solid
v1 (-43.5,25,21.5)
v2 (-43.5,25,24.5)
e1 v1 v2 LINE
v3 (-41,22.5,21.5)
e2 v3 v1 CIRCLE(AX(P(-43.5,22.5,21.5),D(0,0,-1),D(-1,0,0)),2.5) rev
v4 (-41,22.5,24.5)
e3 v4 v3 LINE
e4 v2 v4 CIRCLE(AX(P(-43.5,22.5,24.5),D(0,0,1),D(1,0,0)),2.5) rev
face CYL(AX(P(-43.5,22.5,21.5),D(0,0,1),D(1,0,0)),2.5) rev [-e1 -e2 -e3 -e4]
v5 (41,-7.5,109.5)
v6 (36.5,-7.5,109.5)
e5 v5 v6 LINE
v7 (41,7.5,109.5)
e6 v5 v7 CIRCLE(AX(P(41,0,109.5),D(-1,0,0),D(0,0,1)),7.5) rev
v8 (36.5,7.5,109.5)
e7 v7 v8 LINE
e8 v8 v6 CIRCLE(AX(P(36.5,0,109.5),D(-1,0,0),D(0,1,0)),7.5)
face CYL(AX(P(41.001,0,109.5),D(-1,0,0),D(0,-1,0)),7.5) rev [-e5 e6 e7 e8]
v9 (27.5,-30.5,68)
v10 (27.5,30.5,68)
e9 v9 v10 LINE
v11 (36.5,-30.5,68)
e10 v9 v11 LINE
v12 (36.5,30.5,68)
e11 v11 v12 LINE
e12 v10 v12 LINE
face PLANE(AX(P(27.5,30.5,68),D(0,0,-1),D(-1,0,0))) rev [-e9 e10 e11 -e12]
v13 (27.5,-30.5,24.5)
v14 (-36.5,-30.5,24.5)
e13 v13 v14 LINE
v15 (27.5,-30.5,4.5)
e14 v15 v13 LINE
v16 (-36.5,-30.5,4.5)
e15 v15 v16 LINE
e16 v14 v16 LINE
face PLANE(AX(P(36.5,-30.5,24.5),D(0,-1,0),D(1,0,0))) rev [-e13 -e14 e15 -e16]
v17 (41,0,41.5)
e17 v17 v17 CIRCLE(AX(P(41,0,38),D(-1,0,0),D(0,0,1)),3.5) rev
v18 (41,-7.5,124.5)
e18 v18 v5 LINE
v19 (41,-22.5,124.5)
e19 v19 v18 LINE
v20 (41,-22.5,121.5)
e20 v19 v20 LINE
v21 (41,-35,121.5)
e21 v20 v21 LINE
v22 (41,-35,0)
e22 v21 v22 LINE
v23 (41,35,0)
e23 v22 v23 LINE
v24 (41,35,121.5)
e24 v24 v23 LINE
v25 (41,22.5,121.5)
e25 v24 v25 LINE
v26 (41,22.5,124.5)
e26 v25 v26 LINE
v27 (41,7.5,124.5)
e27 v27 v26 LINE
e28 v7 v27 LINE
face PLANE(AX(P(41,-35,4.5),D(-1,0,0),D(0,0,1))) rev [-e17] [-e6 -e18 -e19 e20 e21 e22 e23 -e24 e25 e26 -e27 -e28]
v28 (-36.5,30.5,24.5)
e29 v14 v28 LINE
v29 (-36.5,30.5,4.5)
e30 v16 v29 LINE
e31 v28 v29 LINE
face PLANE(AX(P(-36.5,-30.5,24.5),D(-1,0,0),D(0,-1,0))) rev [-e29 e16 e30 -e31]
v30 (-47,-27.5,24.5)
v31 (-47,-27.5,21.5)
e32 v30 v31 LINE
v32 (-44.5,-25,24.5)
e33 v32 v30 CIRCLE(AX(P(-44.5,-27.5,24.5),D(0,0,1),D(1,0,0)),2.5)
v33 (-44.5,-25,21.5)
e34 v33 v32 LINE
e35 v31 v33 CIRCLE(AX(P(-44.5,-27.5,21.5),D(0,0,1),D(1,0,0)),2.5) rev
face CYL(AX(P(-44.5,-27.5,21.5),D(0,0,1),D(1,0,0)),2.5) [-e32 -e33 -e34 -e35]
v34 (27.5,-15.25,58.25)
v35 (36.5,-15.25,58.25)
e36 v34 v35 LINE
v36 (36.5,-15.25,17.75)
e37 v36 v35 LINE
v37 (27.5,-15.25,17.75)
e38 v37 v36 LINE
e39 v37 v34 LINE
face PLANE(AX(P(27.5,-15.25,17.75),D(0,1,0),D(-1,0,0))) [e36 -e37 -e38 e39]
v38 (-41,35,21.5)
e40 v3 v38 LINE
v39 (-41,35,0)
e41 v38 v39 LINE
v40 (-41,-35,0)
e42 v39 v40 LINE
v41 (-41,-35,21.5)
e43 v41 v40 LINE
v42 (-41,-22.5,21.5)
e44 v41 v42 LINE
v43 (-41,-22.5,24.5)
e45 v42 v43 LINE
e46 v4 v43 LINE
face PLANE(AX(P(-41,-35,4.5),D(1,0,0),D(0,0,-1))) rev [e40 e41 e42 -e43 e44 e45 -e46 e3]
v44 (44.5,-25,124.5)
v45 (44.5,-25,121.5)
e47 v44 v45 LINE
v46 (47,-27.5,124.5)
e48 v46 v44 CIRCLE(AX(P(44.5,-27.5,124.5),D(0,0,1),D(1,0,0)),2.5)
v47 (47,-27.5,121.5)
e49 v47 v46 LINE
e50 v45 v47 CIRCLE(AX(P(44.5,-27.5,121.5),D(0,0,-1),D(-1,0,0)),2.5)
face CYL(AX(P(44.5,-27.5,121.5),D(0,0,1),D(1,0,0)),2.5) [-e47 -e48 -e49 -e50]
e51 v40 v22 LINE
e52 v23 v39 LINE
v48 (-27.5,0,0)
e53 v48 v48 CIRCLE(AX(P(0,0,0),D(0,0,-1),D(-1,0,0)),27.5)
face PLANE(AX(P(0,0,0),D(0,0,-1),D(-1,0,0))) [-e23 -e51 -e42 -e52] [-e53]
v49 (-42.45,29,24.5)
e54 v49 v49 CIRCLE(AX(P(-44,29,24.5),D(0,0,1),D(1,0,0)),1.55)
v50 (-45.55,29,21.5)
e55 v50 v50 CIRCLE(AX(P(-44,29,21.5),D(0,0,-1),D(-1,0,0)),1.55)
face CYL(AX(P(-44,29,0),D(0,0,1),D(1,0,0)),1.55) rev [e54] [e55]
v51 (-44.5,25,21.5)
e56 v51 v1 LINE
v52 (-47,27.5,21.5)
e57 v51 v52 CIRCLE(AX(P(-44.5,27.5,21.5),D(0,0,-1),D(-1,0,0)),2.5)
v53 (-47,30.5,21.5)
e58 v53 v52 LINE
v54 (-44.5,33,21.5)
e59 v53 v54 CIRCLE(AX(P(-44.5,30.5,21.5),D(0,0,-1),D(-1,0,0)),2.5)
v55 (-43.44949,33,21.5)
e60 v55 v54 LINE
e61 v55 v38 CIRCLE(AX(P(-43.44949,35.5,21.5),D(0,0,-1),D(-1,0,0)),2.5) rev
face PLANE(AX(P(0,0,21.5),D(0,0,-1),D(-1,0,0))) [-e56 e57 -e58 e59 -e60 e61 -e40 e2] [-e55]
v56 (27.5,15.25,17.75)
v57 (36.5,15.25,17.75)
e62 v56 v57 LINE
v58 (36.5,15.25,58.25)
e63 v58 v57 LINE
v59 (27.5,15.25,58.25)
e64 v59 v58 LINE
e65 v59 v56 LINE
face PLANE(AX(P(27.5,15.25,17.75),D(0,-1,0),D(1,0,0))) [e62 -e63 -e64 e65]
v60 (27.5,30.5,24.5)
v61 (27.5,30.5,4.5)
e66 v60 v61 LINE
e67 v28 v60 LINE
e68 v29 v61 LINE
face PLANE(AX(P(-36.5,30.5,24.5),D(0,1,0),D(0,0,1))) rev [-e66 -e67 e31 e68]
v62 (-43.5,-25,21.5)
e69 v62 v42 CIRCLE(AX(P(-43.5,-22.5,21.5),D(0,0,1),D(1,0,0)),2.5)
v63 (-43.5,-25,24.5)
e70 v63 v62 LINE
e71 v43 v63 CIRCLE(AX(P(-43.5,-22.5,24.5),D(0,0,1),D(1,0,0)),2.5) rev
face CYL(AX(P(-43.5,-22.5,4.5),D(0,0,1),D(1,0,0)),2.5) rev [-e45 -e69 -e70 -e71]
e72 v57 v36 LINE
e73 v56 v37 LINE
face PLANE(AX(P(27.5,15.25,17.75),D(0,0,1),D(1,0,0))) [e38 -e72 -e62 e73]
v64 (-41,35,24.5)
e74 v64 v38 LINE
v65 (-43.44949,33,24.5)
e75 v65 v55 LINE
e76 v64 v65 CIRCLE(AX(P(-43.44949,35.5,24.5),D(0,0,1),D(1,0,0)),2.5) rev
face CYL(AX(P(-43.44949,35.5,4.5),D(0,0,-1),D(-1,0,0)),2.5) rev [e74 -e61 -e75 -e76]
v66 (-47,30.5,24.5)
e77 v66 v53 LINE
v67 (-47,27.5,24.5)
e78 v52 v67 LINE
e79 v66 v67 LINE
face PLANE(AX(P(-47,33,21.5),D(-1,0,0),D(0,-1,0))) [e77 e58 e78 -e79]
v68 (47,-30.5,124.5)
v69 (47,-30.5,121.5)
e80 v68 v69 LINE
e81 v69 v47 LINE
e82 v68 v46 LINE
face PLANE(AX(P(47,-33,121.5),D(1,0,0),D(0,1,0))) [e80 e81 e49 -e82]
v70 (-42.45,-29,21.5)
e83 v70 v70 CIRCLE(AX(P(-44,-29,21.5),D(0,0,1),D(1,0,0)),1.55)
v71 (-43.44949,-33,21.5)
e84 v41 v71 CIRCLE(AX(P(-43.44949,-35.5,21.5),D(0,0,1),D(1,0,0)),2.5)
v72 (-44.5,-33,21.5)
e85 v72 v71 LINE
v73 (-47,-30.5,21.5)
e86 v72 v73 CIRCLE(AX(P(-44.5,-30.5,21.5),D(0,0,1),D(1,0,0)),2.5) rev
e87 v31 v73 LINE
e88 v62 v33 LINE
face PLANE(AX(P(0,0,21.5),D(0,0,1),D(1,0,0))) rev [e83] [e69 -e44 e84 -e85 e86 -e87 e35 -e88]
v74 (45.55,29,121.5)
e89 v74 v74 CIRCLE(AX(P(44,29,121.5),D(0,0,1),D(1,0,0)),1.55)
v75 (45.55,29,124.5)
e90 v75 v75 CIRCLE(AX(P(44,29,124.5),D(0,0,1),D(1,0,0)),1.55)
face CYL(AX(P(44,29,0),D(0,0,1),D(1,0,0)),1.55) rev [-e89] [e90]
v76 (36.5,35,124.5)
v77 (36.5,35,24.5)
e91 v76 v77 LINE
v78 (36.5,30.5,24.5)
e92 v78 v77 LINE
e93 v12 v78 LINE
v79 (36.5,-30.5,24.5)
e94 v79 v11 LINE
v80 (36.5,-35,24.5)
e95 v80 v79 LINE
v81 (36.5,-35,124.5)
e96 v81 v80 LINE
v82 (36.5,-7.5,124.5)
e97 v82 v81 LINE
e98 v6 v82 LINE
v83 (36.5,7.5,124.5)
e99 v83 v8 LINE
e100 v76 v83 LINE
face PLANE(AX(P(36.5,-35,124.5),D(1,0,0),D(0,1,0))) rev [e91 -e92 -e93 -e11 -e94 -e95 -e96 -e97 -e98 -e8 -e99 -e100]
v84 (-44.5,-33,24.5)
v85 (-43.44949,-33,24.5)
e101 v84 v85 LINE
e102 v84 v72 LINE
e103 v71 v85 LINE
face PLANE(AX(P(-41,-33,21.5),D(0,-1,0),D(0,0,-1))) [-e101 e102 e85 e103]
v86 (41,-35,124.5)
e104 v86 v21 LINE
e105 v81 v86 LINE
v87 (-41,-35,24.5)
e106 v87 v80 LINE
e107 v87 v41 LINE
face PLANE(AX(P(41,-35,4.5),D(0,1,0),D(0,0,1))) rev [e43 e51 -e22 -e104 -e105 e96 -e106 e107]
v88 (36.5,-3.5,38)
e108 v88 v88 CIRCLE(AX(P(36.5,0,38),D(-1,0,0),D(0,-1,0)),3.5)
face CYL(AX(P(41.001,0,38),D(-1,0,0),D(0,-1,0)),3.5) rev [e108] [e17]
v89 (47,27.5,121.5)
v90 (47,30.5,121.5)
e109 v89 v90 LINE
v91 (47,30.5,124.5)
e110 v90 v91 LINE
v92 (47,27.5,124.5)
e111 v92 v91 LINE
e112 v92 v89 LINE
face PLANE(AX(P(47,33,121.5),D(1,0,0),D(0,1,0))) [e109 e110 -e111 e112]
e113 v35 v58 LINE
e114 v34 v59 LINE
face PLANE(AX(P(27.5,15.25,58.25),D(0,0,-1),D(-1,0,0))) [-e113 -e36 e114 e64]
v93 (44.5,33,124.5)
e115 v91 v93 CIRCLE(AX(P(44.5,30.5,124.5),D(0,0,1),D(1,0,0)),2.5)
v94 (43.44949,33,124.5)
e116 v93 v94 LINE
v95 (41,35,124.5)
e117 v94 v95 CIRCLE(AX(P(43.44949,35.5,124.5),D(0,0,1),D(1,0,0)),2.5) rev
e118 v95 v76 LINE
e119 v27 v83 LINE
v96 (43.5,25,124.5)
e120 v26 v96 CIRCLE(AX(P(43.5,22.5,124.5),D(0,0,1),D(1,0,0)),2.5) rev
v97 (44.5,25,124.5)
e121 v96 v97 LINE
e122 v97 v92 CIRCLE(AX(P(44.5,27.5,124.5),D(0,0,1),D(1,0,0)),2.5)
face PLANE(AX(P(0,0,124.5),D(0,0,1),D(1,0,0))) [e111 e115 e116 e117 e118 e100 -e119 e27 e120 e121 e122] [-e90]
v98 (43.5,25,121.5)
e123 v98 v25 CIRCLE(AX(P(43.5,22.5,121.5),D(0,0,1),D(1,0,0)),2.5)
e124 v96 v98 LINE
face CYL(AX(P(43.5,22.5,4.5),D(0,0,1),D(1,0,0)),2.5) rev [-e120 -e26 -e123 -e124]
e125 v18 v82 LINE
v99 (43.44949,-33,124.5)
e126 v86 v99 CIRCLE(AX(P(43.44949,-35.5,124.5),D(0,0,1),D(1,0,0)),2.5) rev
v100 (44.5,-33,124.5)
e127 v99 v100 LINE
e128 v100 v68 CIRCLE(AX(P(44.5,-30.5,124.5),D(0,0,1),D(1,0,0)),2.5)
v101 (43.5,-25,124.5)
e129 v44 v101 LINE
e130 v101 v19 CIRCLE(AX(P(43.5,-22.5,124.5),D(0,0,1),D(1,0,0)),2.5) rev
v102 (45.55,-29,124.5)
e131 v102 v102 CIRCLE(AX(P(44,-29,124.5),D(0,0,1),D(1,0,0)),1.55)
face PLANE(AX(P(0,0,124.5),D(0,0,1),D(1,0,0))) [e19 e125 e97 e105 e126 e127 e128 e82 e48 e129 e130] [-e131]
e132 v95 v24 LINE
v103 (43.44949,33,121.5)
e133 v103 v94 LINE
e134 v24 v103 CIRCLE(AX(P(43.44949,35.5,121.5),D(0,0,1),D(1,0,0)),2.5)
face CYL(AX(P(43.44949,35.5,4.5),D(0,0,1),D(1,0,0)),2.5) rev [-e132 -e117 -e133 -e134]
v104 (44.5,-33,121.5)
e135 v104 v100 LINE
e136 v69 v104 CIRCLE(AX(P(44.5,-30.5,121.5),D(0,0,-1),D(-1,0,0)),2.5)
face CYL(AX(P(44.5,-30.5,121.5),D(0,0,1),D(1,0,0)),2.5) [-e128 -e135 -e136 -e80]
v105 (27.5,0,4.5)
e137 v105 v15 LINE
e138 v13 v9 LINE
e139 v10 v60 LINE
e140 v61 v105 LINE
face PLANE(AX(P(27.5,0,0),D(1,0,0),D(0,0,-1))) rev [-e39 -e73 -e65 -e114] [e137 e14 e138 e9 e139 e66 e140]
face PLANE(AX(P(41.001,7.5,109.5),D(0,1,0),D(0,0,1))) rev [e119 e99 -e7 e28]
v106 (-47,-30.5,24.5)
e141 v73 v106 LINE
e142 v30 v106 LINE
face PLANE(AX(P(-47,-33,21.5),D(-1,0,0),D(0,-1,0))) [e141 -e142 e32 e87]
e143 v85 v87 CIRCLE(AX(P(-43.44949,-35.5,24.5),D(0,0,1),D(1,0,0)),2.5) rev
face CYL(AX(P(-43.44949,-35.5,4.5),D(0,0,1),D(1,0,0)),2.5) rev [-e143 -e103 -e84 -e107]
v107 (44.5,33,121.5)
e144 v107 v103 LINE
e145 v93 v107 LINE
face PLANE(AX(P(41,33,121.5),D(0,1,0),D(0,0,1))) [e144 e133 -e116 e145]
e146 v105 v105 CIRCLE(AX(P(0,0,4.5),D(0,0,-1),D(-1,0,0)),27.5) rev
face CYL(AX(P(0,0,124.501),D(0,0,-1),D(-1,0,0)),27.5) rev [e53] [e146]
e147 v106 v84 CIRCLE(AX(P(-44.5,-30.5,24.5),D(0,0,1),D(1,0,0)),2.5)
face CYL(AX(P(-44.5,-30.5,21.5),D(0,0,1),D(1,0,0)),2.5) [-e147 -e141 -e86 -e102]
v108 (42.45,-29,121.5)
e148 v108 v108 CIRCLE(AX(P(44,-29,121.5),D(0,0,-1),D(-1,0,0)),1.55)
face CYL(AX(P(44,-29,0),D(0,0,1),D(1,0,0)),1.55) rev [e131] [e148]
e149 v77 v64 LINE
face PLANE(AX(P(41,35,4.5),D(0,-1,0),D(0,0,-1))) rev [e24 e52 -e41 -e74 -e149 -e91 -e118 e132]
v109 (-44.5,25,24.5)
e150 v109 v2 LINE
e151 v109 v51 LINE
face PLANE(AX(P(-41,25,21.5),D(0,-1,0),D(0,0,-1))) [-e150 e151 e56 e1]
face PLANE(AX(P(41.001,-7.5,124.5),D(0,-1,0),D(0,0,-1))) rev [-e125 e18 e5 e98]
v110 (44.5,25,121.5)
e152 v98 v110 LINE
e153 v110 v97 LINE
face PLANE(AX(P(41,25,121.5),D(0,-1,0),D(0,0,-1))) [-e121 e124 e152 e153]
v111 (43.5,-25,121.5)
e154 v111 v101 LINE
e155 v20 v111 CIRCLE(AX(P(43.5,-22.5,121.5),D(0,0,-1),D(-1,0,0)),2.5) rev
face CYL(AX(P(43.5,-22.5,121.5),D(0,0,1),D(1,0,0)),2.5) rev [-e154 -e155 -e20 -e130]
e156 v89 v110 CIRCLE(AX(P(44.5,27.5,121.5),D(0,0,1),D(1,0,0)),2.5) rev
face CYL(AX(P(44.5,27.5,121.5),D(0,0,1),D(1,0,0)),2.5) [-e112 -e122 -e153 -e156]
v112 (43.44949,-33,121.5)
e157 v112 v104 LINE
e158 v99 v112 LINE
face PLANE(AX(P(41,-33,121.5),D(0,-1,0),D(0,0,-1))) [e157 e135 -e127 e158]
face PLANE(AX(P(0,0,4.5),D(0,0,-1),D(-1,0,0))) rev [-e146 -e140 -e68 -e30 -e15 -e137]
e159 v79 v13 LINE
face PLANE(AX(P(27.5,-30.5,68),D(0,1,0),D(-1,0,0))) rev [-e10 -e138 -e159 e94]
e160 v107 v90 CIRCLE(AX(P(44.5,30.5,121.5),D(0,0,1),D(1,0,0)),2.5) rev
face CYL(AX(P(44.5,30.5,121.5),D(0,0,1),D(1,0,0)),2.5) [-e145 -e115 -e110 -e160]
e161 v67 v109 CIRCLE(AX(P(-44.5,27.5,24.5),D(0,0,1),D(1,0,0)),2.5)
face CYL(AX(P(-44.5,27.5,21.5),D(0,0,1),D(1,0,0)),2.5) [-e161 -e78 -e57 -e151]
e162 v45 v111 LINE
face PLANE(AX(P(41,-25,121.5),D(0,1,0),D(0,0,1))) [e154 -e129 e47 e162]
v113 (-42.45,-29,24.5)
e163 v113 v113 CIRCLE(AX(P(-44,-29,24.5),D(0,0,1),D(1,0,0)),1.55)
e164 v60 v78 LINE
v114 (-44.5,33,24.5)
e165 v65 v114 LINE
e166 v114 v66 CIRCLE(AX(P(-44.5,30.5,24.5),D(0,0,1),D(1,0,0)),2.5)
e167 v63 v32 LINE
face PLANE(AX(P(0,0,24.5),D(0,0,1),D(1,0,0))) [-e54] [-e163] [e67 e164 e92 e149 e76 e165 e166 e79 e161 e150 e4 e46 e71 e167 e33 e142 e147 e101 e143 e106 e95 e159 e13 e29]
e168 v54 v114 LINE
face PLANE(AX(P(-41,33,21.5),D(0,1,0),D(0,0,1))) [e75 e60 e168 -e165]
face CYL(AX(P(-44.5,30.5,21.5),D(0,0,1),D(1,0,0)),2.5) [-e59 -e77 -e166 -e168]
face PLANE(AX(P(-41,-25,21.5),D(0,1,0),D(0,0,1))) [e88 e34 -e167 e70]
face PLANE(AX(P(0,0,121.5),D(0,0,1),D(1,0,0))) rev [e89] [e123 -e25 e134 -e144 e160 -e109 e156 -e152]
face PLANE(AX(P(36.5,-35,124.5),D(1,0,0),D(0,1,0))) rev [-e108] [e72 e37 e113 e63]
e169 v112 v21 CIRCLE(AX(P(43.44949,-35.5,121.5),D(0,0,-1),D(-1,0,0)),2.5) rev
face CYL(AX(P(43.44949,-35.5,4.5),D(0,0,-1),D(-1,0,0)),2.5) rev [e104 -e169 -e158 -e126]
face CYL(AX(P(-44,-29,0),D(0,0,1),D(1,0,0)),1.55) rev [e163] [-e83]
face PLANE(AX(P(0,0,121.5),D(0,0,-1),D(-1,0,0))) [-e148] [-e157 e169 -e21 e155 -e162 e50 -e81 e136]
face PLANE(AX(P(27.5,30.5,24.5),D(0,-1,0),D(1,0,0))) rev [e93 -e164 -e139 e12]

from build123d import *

# Parameters (mm, degrees)
SKETCH1_W               = 70
SKETCH1_H               = 82
BOSS_EXTRUDE1_DEPTH     = 4.5
SKETCH2_W               = 4.5
SKETCH2_H               = 70
BOSS_EXTRUDE2_DEPTH     = 120
BOSS_EXTRUDE3_DEPTH     = 20
CUT_EXTRUDE1_REACH      = 137.67
SKETCH4_R               = 27.5
CUT_EXTRUDE2_REACH      = 152.77
SKETCH5_R               = 3.5
SKETCH6_W               = 6
SKETCH6_H               = 8
BOSS_EXTRUDE4_DEPTH     = 3
SKETCH7_W               = 6
SKETCH7_H               = 8
BOSS_EXTRUDE5_DEPTH     = 3
CUT_EXTRUDE4_DEPTH      = 116.905133622
CUT_EXTRUDE4_DEPTH_BACK = 116.905133622
SKETCH8_R               = 1.55
FILLET1_R               = 2.5
SKETCH9_W               = 30.5
SKETCH9_H               = 40.5
BOSS_EXTRUDE6_DEPTH     = 9


with BuildPart() as part:
    # Sketch1 → Boss-Extrude1 (new body)
    with BuildSketch(Plane(origin=(0, 0, 0), x_dir=(0, 1, 0), z_dir=(0, 0, 1))):
        Rectangle(SKETCH1_W, SKETCH1_H)
    extrude(amount=BOSS_EXTRUDE1_DEPTH)

    # Sketch2 → Boss-Extrude2 (add)
    with BuildSketch(Plane.XY.offset(4.5)):
        with Locations((38.75, 0)):
            Rectangle(SKETCH2_W, SKETCH2_H)
    extrude(amount=BOSS_EXTRUDE2_DEPTH)

    # Sketch3 → Boss-Extrude3 (add)
    with BuildSketch(Plane.XY.offset(4.5)):
        Polygon((36.5, 35), (-41, 35), (-41, -35), (36.5, -35), (36.5, -30.5), (-36.5, -30.5), (-36.5, 30.5), (36.5, 30.5), align=None)
    extrude(amount=BOSS_EXTRUDE3_DEPTH)

    # Sketch4 → Cut-Extrude1 (cut, up to next)
    with BuildSketch(Plane(origin=(0, 0, 0), x_dir=(1, 0, 0), z_dir=(0, 0, -1)), mode=Mode.PRIVATE) as cut_extrude1_sk1:
        with Locations(Location((0, 0, 0), (0, 0, 180))):
            Circle(SKETCH4_R)
    cut_extrude1_tool1 = extrude(cut_extrude1_sk1.sketch, amount=-CUT_EXTRUDE1_REACH, mode=Mode.PRIVATE) & part.part
    add(cut_extrude1_tool1.solids().sort_by_distance((0, 0, 0))[0], mode=Mode.SUBTRACT)

    # Sketch5 → Cut-Extrude2 (cut, up to next)
    with BuildSketch(Plane(origin=(36.5, 0, 0), x_dir=(0, -1, 0), z_dir=(-1, 0, 0)), mode=Mode.PRIVATE) as cut_extrude2_sk1:
        with Locations((0, 38)):
            Circle(SKETCH5_R)
    cut_extrude2_tool1 = extrude(cut_extrude2_sk1.sketch, amount=-CUT_EXTRUDE2_REACH, mode=Mode.PRIVATE) & part.part
    # Sketch5 → Cut-Extrude2 (cut, up to next)
    with BuildSketch(Plane(origin=(36.5, 0, 0), x_dir=(0, -1, 0), z_dir=(-1, 0, 0)), mode=Mode.PRIVATE) as cut_extrude2_sk2:
        with BuildLine():
            Line((-7.5, 124.5), (7.5, 124.5))
            Line((7.5, 124.5), (7.5, 109.5))
            ThreePointArc((7.5, 109.5), (0, 102), (-7.5, 109.5))
            Line((-7.5, 109.5), (-7.5, 124.5))
        make_face()
    cut_extrude2_tool2 = extrude(cut_extrude2_sk2.sketch, amount=-CUT_EXTRUDE2_REACH, mode=Mode.PRIVATE) & part.part
    add(cut_extrude2_tool1.solids().sort_by_distance((36.5, 0, 38))[0], mode=Mode.SUBTRACT)
    add(cut_extrude2_tool2.solids().sort_by_distance((36.5, 0, 113.987689))[0], mode=Mode.SUBTRACT)

    # Sketch6 → Boss-Extrude4 (add)
    with BuildSketch(Plane.XY.offset(124.5)):
        with Locations((44, 29)):
            Rectangle(SKETCH6_W, SKETCH6_H)
        with Locations((44, -29)):
            Rectangle(SKETCH6_W, SKETCH6_H)
    extrude(amount=-BOSS_EXTRUDE4_DEPTH)

    # Sketch7 → Boss-Extrude5 (add)
    with BuildSketch(Plane.XY.offset(24.5)):
        with Locations((-44, -29)):
            Rectangle(SKETCH7_W, SKETCH7_H)
        with Locations((-44, 29)):
            Rectangle(SKETCH7_W, SKETCH7_H)
    extrude(amount=-BOSS_EXTRUDE5_DEPTH)

    # Sketch8 → Cut-Extrude4 (cut, two sides: drawn at the far end of the back side and taken through both)
    with BuildSketch(Plane.XY.offset(24.5).offset(-CUT_EXTRUDE4_DEPTH_BACK)):
        with Locations((-44, 29)):
            Circle(SKETCH8_R)
        with Locations((44, 29)):
            Circle(SKETCH8_R)
        with Locations((44, -29)):
            Circle(SKETCH8_R)
        with Locations((-44, -29)):
            Circle(SKETCH8_R)
    extrude(amount=CUT_EXTRUDE4_DEPTH + CUT_EXTRUDE4_DEPTH_BACK, mode=Mode.SUBTRACT)

    # Fillet1
    # the kernel refuses this fillet: 2.5 mm, written as the material it adds along each edge
    with BuildSketch(Plane(origin=(-41, 33, 24.5), x_dir=(-1.5774048733869181e-12, 1.0, 0), z_dir=(0, 0, -1)), Plane(origin=(41, -33, 124.5), x_dir=(1.5312195955625318e-12, -1.0, 0), z_dir=(0, 0, -1))) as fillet1_piece_1:
        with BuildLine():
            CenterArc((2.5, -2.449489743), FILLET1_R, 101.536959033, 78.463040967)
            Line((0, -2.449489743), (0, 0))
            Line((0, 0), (2, 0))
        make_face()
    extrude(amount=3)
    with BuildSketch(Plane(origin=(-41, 25, 24.5), x_dir=(0, -1, 0), z_dir=(0, 0, -1)), Plane(origin=(41, -25, 124.5), x_dir=(0, 1, 0), z_dir=(0, 0, -1))) as fillet1_piece_2:
        with BuildLine():
            CenterArc((FILLET1_R, FILLET1_R), FILLET1_R, 180, 90)
            Line((0, FILLET1_R), (0, 0))
            Line((0, 0), (FILLET1_R, 0))
        make_face()
    extrude(amount=3)
    with BuildSketch(Plane(origin=(-41, -25, 24.5), x_dir=(0, 1, 0), z_dir=(0, 0, -1)), Plane(origin=(41, 25, 124.5), x_dir=(0, -1, 0), z_dir=(0, 0, -1))) as fillet1_piece_3:
        with BuildLine():
            CenterArc((FILLET1_R, -FILLET1_R), FILLET1_R, 90, 90)
            Line((0, -FILLET1_R), (0, 0))
            Line((0, 0), (FILLET1_R, 0))
        make_face()
    extrude(amount=3)
    with BuildSketch(Plane(origin=(-41, -33, 24.5), x_dir=(-1.6022738691384966e-12, -1.0, 0), z_dir=(0, 0, -1)), Plane(origin=(41, 33, 124.5), x_dir=(1.4885870314169656e-12, 1.0, 0), z_dir=(0, 0, -1))) as fillet1_piece_4:
        with BuildLine():
            CenterArc((2.5, 2.449489743), FILLET1_R, 180, 78.463040967)
            Line((0, 2.449489743), (0, 0))
            Line((0, 0), (2, 0))
        make_face()
    extrude(amount=3)
    # the kernel refuses this fillet: 2.5 mm, written as the material it takes off along each edge
    with BuildSketch(Plane(origin=(-47, 25, 30.75), x_dir=(1, 0, 0), z_dir=(0, 0, -1)), Plane(origin=(-47, 33, 30.75), x_dir=(0, -1, 0), z_dir=(0, 0, -1)), Plane(origin=(-47, -33, 30.75), x_dir=(1, 0, 0), z_dir=(0, 0, -1)), Plane(origin=(-47, -25, 30.75), x_dir=(0, -1, 0), z_dir=(0, 0, -1)), Plane(origin=(47, 33, 130.75), x_dir=(-1, 0, 0), z_dir=(0, 0, -1)), Plane(origin=(47, 25, 130.75), x_dir=(0, 1, 0), z_dir=(0, 0, -1))) as fillet1_2_piece_1:
        with BuildLine():
            CenterArc((FILLET1_R, -FILLET1_R), FILLET1_R, 90, 90)
            Line((0, -FILLET1_R), (0, 0))
            Line((0, 0), (FILLET1_R, 0))
        make_face()
    extrude(amount=15.5, mode=Mode.SUBTRACT)
    with BuildSketch(Plane(origin=(47, -25, 130.75), x_dir=(0, -1, 0), z_dir=(0, 0, -1)), Plane(origin=(47, -33, 130.75), x_dir=(-1, 0, 0), z_dir=(0, 0, -1))) as fillet1_2_piece_2:
        with BuildLine():
            CenterArc((FILLET1_R, FILLET1_R), FILLET1_R, 180, 90)
            Line((0, FILLET1_R), (0, 0))
            Line((0, 0), (FILLET1_R, 0))
        make_face()
    extrude(amount=15.5, mode=Mode.SUBTRACT)

    # Sketch9 → Boss-Extrude6 (add)
    with BuildSketch(Plane(origin=(36.5, 0, 0), x_dir=(0, -1, 0), z_dir=(-1, 0, 0))):
        Polygon((-30.5, 24.5), (-30.5, 68), (30.5, 68), (30.5, 24.5), (30.5, 4.5), (-30.5, 4.5), align=None)
        with Locations((0, 38)):
            Rectangle(SKETCH9_W, SKETCH9_H, mode=Mode.SUBTRACT)
    extrude(amount=BOSS_EXTRUDE6_DEPTH)


solid = part.part
